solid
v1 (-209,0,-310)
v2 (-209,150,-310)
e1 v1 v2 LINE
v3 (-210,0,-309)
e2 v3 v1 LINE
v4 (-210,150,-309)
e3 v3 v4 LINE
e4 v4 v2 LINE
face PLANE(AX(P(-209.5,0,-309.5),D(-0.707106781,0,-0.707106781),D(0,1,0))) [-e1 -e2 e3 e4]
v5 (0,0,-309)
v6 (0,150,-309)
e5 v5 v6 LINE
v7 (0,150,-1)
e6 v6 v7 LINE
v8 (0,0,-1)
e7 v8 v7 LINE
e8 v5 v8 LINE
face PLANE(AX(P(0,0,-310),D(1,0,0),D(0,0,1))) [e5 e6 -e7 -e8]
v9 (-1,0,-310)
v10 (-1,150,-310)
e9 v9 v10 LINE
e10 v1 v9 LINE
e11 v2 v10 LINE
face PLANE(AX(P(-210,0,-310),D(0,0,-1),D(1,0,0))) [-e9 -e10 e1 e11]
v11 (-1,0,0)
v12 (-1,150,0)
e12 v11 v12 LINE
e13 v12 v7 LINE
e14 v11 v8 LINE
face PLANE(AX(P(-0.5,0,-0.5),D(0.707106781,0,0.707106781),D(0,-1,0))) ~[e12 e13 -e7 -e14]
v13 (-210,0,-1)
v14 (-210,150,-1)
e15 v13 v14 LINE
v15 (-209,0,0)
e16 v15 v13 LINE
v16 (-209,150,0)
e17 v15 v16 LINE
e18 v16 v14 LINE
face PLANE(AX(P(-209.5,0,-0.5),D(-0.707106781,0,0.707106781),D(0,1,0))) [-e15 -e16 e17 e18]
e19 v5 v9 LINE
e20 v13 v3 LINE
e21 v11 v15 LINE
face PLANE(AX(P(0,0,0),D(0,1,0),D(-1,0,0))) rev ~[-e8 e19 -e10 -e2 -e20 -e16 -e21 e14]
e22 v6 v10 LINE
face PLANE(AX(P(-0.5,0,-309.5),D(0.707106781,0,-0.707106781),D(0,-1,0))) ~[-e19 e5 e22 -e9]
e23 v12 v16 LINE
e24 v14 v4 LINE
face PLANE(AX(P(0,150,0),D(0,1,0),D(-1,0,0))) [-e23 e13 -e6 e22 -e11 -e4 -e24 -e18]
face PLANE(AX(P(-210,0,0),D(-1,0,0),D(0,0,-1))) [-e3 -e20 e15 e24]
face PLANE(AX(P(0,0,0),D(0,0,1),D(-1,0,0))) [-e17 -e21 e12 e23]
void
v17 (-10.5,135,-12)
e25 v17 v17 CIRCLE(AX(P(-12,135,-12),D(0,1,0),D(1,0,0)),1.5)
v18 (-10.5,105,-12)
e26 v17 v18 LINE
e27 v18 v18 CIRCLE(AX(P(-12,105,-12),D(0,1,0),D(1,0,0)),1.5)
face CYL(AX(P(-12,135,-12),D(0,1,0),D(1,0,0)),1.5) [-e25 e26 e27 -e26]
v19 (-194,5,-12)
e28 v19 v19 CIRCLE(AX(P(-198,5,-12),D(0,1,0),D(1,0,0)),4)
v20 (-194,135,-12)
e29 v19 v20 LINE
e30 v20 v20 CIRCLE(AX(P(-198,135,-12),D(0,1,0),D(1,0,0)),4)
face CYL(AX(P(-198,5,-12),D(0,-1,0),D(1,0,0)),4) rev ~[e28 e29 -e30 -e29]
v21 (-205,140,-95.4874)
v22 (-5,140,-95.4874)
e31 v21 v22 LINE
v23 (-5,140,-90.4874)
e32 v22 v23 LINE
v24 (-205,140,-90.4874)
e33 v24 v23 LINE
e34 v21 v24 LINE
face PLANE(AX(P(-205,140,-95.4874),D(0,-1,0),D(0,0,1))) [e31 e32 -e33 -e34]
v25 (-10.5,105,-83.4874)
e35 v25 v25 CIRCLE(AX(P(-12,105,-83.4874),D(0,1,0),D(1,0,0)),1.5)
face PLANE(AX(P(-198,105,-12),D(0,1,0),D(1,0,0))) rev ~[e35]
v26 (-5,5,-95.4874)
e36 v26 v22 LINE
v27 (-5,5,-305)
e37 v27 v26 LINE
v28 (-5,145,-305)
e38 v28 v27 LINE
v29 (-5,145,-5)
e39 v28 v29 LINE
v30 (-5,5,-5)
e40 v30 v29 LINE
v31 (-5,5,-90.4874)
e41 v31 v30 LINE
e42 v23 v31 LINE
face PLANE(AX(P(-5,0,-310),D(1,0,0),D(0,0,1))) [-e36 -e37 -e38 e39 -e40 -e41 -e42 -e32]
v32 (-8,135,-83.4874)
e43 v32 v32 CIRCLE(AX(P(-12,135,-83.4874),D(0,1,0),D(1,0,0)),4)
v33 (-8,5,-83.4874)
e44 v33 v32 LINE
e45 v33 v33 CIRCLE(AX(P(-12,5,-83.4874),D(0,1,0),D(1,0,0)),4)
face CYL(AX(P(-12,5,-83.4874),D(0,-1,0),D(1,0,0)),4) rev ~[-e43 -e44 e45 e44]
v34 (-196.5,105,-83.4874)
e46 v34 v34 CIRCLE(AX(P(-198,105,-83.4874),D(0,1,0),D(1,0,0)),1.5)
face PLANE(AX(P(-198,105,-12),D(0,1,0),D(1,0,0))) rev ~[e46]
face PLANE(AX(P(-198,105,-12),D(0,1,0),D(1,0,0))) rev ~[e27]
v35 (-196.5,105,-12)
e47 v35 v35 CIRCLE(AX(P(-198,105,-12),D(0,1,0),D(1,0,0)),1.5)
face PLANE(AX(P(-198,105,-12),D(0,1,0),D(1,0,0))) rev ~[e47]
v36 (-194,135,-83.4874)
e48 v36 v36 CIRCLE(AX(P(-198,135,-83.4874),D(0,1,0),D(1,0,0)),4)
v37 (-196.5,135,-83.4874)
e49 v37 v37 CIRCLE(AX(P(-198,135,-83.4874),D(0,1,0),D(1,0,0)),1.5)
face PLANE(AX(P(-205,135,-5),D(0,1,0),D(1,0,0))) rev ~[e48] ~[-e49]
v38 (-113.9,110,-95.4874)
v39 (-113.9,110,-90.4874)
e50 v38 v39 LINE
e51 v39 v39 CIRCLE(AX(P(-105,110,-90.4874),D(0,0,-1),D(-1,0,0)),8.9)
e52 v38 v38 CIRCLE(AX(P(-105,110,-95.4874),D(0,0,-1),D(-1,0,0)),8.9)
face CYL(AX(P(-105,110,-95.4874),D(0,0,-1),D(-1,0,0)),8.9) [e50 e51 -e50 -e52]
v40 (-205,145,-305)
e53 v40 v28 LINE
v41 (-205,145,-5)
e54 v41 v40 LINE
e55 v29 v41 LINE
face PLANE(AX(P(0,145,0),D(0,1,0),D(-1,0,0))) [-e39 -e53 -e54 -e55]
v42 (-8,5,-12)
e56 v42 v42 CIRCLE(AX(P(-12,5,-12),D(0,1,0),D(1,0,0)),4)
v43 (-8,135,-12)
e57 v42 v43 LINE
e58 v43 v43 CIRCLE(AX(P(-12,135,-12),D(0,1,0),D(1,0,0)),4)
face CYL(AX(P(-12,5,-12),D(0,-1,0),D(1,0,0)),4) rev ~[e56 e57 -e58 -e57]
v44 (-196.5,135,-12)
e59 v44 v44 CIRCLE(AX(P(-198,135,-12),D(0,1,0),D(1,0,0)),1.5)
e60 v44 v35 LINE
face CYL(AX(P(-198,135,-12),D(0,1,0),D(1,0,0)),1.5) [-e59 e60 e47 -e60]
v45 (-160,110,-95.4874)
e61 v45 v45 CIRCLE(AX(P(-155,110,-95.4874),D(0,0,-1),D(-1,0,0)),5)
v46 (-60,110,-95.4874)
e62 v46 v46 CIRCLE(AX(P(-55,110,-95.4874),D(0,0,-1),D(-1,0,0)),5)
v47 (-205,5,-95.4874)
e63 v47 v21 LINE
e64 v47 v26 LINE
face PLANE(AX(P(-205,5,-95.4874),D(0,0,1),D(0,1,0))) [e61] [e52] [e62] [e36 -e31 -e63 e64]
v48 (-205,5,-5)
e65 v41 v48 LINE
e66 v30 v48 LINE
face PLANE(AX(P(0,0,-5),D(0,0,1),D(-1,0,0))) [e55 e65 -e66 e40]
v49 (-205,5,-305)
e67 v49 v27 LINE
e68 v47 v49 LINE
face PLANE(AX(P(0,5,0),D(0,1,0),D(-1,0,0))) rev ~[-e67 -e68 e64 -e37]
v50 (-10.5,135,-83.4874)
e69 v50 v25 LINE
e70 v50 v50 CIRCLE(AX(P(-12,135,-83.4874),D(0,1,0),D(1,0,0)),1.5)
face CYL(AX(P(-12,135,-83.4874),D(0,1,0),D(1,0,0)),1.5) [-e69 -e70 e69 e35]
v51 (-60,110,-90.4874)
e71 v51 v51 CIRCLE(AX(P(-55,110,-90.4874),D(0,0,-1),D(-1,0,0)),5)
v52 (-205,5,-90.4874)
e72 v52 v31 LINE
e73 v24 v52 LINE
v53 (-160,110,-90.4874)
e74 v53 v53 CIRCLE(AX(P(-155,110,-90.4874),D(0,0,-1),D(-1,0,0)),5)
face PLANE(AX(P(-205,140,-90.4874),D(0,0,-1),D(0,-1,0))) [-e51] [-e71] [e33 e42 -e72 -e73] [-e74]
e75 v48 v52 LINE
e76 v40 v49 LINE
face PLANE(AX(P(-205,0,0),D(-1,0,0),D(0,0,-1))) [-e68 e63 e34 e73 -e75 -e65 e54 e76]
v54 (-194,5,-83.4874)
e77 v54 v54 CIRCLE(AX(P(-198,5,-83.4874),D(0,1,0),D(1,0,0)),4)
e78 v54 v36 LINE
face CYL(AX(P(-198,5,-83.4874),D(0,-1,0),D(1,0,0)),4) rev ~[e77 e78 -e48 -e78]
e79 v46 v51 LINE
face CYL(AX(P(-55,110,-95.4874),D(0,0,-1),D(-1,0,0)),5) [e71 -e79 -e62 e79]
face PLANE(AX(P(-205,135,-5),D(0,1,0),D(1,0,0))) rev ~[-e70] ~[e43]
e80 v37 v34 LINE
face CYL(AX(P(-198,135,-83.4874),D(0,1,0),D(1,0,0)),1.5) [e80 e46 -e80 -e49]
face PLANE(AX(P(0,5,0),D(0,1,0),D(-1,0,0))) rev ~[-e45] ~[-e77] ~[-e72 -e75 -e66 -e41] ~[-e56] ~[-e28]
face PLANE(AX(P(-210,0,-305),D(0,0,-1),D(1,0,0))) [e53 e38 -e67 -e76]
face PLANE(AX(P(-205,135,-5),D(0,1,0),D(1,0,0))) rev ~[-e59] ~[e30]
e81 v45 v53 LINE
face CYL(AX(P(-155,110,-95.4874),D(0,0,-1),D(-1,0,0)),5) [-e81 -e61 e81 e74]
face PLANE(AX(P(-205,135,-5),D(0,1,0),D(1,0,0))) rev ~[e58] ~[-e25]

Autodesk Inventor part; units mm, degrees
ref_plane "YZ Plane" through (0, 0, 0) normal (1, 0, 0) x (0, 1, 0)
ref_plane "XZ Plane" through (0, 0, 0) normal (0, 1, 0) x (-1, 0, 0)
ref_plane "XY Plane" through (0, 0, 0) normal (0, 0, 1) x (1, 0, 0)
sketch "Sketch4" plane through (0, 0, 0) normal (0, 1, 0) x (-1, 0, 0)
  line L0 (0, 0) -> (210, 0)
  line L1 (210, 0) -> (210, -310)
  line L2 (210, -310) -> (0, -310)
  line L3 (0, -310) -> (0, 0)
  dimension "d9" = 310
  dimension "d10" = 210
extrude "Extrusion3" add sketch "Sketch4" along normal blind 150
shell "Shell1" thickness 5 removed faces 0
sketch "Sketch5" plane through (-205, 5, -305) normal (1, 0, 0) x (0, 0, -1)
  line L0 (0, 0) -> (-300, 0) projected
  line L1 (-214.5126, 0) -> (-209.5126, 0)
  line L2 (-209.5126, 0) -> (-209.5126, 135)
  line L3 (-209.5126, 135) -> (-214.5126, 135)
  line L4 (-214.5126, 135) -> (-214.5126, 0)
  point P0 (-305, -5)
  point P1 (-209.5126, 0)
  dimension "d18" = 5
  dimension "d19" = 135
extrude "Extrusion4" add sketch "Sketch5" along normal blind 200
sketch "Sketch6" plane through (-205, 5, -95.4874) normal (0, 0, -1) x (-1, 0, 0)
  circle A0 centre (-150, 105) radius 5
  circle A1 centre (-100, 105) radius 8.9
  circle A2 centre (-50, 105) radius 5
  line L0 (0, 135) -> (0, 0) projected
  line L1 (0, 135) -> (-200, 135) projected
  point P0 (-205, -5)
chamfer "Chamfer1" distance 1 angle 45 4 edges at (-210, 75, -310) (0, 75, -310) (0, 75, 0) (-210, 75, 0)
extrude "Extrusion5" cut sketch "Sketch6" against normal blind 10
sketch "Sketch7" plane through (-205, 5, -5) normal (0, 1, 0) x (1, 0, 0)
  circle A0 centre (7, 7) radius 4
  circle A1 centre (7, 78.4874) radius 4
  circle A2 centre (193, 7) radius 4
  circle A3 centre (193, 78.4874) radius 4
  line L0 (0, 0) -> (200, 0) projected
  line L1 (200, 0) -> (200, 85.4874) projected
  line L2 (0, 85.4874) -> (200, 85.4874) projected
  line L3 (0, 85.4874) -> (0, 0) projected
  point P0 (205, -5)
  dimension "d37" = 8
  dimension "d38" = 8
  dimension "d39" = 8
  dimension "d40" = 8
  dimension "d41" = 7
  dimension "d42" = 7
  dimension "d43" = 7
  dimension "d44" = 7
  dimension "d45" = 7
  dimension "d46" = 7
  dimension "d47" = 7
  dimension "d48" = 7
extrude "Extrusion6" add sketch "Sketch7" along normal blind 130 contours A0 | A1 | A2 | A3
sketch "Sketch8" plane through (-198, 135, -12) normal (0, 1, 0) x (1, 0, 0)
  circle A0 centre (0, 0) radius 1.5
  circle A1 centre (0, 71.4874) radius 4 projected
  circle A2 centre (0, 71.4874) radius 1.5
  circle A3 centre (186, 0) radius 4 projected
  circle A4 centre (186, 0) radius 1.5
  circle A5 centre (186, 71.4874) radius 4 projected
  circle A6 centre (186, 71.4874) radius 1.5
  point P0 (198, -12)
  dimension "d51" = 3
  dimension "d52" = 3
  dimension "d53" = 3
  dimension "d54" = 3
extrude "Extrusion7" cut sketch "Sketch8" against normal blind 30 contours A0 | A2 | A4 | A6
equation "\"d9\" = Panjang_outer"
equation "\"d10\" = Lebar_outer"
equation "\"d11\" = Tinggi_Box"
equation "\"d42\" = d41"
equation "\"d43\" = d41"
equation "\"d44\" = d41"
equation "\"d45\" = d41"
equation "\"d46\" = d41"
equation "\"d47\" = d41"
equation "\"d48\" = d41"
equation "\"Lebar_outer\" = 210"
equation "\"Panjang_outer\" = 310"
equation "\"Tinggi_Box\" = 150"
properties part number "Box"
